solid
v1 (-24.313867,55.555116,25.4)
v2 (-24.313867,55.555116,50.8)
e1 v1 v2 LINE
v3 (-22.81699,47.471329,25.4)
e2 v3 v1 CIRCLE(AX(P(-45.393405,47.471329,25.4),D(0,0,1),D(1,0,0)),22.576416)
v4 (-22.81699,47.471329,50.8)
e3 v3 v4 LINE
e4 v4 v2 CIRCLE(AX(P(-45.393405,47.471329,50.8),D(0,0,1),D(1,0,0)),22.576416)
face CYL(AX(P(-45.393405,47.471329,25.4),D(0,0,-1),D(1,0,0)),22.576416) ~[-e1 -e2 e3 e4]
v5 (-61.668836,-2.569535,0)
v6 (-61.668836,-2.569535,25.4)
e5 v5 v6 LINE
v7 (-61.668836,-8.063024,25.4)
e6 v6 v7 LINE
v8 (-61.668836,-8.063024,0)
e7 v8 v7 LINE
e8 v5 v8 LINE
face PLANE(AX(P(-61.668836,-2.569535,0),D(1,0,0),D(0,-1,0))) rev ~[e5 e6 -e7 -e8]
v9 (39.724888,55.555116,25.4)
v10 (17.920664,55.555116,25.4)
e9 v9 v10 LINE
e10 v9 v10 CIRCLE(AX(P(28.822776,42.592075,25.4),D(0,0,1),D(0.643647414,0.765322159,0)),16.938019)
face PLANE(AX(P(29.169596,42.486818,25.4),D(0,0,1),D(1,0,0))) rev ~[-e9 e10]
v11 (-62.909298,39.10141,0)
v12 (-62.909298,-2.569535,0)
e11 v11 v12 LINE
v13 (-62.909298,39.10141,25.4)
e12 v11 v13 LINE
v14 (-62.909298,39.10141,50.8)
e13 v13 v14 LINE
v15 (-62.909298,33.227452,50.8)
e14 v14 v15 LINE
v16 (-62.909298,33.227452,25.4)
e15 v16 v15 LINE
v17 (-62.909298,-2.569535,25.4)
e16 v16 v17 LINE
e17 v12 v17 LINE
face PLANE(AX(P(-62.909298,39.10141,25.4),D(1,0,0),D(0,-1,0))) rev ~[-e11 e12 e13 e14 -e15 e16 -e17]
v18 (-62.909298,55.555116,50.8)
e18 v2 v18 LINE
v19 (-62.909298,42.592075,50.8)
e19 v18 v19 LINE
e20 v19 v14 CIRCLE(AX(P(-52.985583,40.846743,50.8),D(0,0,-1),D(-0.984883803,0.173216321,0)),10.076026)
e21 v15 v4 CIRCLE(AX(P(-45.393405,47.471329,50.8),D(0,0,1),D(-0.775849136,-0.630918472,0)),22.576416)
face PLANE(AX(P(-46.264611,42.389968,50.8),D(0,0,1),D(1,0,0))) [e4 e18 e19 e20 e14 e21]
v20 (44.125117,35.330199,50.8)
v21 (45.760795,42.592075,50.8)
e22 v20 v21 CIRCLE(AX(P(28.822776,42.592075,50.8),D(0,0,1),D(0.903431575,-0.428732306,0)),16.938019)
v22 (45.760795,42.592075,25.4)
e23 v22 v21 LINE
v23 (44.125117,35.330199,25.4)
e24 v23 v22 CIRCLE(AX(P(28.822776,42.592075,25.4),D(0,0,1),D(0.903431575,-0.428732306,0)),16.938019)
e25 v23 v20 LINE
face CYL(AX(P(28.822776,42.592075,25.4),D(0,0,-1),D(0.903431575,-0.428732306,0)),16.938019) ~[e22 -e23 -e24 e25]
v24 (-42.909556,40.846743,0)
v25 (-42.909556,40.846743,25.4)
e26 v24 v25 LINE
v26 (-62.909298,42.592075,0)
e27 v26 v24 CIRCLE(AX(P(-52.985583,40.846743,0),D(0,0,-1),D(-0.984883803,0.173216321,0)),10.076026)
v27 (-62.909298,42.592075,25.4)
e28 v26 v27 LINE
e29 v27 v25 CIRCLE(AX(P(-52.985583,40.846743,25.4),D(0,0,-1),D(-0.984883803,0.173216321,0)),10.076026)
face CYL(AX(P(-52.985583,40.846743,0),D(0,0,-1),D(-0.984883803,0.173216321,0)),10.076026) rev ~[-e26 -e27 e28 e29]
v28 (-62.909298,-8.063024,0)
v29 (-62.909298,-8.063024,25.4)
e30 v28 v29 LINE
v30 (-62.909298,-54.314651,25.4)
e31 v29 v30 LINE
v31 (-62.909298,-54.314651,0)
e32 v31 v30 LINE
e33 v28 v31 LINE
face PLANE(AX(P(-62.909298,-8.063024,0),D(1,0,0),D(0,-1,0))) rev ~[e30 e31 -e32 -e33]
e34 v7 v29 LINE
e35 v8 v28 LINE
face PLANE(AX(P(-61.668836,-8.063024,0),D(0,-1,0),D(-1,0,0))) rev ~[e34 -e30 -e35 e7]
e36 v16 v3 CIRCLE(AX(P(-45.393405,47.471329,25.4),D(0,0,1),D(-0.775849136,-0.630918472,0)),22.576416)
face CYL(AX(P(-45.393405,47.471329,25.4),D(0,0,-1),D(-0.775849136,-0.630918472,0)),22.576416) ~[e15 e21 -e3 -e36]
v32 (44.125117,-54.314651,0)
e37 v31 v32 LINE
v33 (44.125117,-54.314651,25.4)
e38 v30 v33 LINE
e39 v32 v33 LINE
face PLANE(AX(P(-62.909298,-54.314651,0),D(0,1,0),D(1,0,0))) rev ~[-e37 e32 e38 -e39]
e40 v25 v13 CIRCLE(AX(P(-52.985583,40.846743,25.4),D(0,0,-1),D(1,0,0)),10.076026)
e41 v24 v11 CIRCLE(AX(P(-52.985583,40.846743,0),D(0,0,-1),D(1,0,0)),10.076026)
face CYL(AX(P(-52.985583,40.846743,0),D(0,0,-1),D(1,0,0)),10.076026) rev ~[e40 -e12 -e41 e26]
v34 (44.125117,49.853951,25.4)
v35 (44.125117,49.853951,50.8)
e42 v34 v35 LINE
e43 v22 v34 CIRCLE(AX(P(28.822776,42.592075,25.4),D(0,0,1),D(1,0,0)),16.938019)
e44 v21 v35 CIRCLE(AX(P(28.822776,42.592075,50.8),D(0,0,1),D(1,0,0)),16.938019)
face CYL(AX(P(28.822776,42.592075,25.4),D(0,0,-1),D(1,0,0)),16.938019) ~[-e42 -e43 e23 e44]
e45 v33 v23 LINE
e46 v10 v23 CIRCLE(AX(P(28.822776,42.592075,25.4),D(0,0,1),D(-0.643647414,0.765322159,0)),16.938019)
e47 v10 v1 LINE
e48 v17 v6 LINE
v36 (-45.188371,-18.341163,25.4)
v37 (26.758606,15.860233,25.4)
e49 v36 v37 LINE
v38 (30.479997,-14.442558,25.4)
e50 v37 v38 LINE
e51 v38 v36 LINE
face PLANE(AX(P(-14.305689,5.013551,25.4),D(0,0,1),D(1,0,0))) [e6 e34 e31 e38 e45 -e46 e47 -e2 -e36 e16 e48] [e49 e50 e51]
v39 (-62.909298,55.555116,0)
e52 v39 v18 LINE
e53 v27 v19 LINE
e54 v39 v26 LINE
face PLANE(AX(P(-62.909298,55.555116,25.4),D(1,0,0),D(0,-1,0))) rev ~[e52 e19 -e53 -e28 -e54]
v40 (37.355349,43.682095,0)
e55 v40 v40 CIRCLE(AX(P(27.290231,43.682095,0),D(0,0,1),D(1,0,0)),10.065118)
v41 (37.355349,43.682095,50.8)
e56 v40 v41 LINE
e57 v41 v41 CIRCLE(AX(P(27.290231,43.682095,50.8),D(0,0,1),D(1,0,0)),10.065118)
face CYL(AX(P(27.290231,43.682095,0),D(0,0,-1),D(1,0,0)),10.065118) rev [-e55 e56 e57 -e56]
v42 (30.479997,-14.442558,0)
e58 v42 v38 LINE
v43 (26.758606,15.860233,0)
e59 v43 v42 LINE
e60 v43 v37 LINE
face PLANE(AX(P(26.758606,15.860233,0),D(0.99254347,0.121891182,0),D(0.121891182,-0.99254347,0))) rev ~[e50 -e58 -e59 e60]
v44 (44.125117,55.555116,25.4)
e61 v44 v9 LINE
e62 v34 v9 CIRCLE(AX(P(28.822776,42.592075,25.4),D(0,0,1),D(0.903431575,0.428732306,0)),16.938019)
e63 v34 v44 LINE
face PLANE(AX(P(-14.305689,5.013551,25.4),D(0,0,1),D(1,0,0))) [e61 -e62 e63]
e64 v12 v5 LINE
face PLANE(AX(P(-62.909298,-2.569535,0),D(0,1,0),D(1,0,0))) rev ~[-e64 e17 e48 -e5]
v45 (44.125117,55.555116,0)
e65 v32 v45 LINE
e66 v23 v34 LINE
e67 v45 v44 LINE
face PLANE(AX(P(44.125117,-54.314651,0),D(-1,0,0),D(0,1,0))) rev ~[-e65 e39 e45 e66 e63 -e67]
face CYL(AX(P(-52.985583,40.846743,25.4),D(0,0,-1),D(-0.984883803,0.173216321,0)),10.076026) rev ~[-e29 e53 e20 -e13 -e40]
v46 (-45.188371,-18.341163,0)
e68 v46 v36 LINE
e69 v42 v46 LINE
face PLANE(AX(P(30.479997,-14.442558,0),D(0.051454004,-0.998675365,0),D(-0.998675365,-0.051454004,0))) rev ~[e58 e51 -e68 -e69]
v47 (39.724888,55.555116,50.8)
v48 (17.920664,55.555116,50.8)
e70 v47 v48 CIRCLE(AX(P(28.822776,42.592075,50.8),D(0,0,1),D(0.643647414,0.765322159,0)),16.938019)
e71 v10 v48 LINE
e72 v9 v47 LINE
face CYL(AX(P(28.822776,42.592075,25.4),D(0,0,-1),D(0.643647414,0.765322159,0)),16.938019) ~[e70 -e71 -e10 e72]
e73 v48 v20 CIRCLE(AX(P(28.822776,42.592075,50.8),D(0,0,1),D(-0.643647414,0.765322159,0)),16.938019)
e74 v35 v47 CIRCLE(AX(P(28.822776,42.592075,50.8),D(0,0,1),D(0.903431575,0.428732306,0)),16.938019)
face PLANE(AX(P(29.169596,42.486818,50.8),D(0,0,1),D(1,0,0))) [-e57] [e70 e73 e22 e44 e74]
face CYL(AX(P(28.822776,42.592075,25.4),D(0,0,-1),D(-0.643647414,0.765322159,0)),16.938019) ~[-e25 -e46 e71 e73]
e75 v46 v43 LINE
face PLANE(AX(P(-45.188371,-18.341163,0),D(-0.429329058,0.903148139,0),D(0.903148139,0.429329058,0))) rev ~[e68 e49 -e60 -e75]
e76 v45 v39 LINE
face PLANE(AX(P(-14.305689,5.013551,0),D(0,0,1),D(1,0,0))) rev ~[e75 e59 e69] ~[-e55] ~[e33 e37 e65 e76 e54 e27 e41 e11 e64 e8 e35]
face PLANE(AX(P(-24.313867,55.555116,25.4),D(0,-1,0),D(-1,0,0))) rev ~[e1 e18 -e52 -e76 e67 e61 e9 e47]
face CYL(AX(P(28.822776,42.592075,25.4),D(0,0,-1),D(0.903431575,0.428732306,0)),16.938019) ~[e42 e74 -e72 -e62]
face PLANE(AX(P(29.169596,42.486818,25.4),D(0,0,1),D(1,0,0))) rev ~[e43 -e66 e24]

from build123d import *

# Parameters (mm, degrees)
F0_R     = 10.0651181203
F1_DEPTH = 25.4
F2_R     = 10.0651181203
F3_DEPTH = 25.4


with BuildPart() as f1:
    # F0 (on Top) → F1 (new body)
    with BuildSketch(Plane.XY):
        with BuildLine():
            Line((44.1251173615, 55.5551163852), (-62.9092976451, 55.5551163852))
            Line((-62.9092976451, 55.5551163852), (-62.9092976451, 42.5920749035))
            ThreePointArc((-62.9092976451, 42.5920749035), (-52.109599733, 50.8846190086), (-42.9095561607, 40.8467426896))
            ThreePointArc((-42.9095561607, 40.8467426896), (-52.109599733, 30.8088663707), (-62.9092976451, 39.1014104757))
            Line((-62.9092976451, 39.1014104757), (-62.9092976451, -2.5695350487))
            Line((-62.9092976451, -2.5695350487), (-61.6688355803, -2.5695350487))
            Line((-61.6688355803, -2.5695350487), (-61.6688355803, -8.0630239099))
            Line((-61.6688355803, -8.0630239099), (-62.9092976451, -8.0630239099))
            Line((-62.9092976451, -8.0630239099), (-62.9092976451, -54.3146505952))
            Line((-62.9092976451, -54.3146505952), (-55.1120936871, -54.3146505952))
            Line((-55.1120936871, -54.3146505952), (34.910235554, -54.3146505952))
            Line((34.910235554, -54.3146505952), (44.1251173615, -54.3146505952))
            Line((44.1251173615, -54.3146505952), (44.1251173615, 20.8220928907))
            Line((44.1251173615, 20.8220928907), (44.1251173615, 28.4420922399))
            Line((44.1251173615, 28.4420922399), (44.1251173615, 55.5551163852))
        make_face()
        Polygon((30.4799973965, -14.4425584003), (-45.1883710921, -18.3411631733), (26.7586056143, 15.8602334559), align=None, mode=Mode.SUBTRACT)
        with Locations((27.2902306169, 43.6820946634)):
            Circle(F0_R, mode=Mode.SUBTRACT)
    extrude(amount=F1_DEPTH)

    # F2 (on face) → F3 (join)
    with BuildSketch(Plane.XY.offset(25.4)):
        with BuildLine():
            ThreePointArc((-62.9092976451, 33.2274518748), (-37.8353474986, 26.1976296864), (-22.8169896281, 47.4713294781))
            ThreePointArc((-22.8169896281, 47.4713294781), (-23.1943629489, 51.5819332274), (-24.3138670359, 55.5551163852))
            Line((-24.3138670359, 55.5551163852), (-62.9092976451, 55.5551163852))
            Line((-62.9092976451, 55.5551163852), (-62.9092976451, 42.5920749035))
            ThreePointArc((-62.9092976451, 42.5920749035), (-42.9095561607, 40.8467426896), (-62.9092976451, 39.1014104757))
            Line((-62.9092976451, 39.1014104757), (-62.9092976451, 33.2274518748))
        make_face()
        with BuildLine():
            Line((39.7248882397, 55.5551163852), (17.9206636207, 55.5551163852))
            ThreePointArc((17.9206636207, 55.5551163852), (18.4737505401, 29.1833400362), (44.1251173615, 35.3301988385))
            Line((44.1251173615, 35.3301988385), (44.1251173615, 49.8539509685))
            ThreePointArc((44.1251173615, 49.8539509685), (42.2315107975, 52.9411002936), (39.7248882397, 55.5551163852))
        make_face()
        with Locations((27.2902306169, 43.6820946634)):
            Circle(F2_R, mode=Mode.SUBTRACT)
        with BuildLine():
            ThreePointArc((39.7248882397, 55.5551163852), (28.8227759302, 59.5300941875), (17.9206636207, 55.5551163852))
            Line((17.9206636207, 55.5551163852), (39.7248882397, 55.5551163852))
        make_face()
        with BuildLine():
            Line((44.1251173615, 49.8539509685), (44.1251173615, 35.3301988385))
            ThreePointArc((44.1251173615, 35.3301988385), (45.3468167725, 38.8701706187), (45.7607952142, 42.5920749035))
            ThreePointArc((45.7607952142, 42.5920749035), (45.3468167725, 46.3139791883), (44.1251173615, 49.8539509685))
        make_face()
    extrude(amount=F3_DEPTH)


solid = f1.part
